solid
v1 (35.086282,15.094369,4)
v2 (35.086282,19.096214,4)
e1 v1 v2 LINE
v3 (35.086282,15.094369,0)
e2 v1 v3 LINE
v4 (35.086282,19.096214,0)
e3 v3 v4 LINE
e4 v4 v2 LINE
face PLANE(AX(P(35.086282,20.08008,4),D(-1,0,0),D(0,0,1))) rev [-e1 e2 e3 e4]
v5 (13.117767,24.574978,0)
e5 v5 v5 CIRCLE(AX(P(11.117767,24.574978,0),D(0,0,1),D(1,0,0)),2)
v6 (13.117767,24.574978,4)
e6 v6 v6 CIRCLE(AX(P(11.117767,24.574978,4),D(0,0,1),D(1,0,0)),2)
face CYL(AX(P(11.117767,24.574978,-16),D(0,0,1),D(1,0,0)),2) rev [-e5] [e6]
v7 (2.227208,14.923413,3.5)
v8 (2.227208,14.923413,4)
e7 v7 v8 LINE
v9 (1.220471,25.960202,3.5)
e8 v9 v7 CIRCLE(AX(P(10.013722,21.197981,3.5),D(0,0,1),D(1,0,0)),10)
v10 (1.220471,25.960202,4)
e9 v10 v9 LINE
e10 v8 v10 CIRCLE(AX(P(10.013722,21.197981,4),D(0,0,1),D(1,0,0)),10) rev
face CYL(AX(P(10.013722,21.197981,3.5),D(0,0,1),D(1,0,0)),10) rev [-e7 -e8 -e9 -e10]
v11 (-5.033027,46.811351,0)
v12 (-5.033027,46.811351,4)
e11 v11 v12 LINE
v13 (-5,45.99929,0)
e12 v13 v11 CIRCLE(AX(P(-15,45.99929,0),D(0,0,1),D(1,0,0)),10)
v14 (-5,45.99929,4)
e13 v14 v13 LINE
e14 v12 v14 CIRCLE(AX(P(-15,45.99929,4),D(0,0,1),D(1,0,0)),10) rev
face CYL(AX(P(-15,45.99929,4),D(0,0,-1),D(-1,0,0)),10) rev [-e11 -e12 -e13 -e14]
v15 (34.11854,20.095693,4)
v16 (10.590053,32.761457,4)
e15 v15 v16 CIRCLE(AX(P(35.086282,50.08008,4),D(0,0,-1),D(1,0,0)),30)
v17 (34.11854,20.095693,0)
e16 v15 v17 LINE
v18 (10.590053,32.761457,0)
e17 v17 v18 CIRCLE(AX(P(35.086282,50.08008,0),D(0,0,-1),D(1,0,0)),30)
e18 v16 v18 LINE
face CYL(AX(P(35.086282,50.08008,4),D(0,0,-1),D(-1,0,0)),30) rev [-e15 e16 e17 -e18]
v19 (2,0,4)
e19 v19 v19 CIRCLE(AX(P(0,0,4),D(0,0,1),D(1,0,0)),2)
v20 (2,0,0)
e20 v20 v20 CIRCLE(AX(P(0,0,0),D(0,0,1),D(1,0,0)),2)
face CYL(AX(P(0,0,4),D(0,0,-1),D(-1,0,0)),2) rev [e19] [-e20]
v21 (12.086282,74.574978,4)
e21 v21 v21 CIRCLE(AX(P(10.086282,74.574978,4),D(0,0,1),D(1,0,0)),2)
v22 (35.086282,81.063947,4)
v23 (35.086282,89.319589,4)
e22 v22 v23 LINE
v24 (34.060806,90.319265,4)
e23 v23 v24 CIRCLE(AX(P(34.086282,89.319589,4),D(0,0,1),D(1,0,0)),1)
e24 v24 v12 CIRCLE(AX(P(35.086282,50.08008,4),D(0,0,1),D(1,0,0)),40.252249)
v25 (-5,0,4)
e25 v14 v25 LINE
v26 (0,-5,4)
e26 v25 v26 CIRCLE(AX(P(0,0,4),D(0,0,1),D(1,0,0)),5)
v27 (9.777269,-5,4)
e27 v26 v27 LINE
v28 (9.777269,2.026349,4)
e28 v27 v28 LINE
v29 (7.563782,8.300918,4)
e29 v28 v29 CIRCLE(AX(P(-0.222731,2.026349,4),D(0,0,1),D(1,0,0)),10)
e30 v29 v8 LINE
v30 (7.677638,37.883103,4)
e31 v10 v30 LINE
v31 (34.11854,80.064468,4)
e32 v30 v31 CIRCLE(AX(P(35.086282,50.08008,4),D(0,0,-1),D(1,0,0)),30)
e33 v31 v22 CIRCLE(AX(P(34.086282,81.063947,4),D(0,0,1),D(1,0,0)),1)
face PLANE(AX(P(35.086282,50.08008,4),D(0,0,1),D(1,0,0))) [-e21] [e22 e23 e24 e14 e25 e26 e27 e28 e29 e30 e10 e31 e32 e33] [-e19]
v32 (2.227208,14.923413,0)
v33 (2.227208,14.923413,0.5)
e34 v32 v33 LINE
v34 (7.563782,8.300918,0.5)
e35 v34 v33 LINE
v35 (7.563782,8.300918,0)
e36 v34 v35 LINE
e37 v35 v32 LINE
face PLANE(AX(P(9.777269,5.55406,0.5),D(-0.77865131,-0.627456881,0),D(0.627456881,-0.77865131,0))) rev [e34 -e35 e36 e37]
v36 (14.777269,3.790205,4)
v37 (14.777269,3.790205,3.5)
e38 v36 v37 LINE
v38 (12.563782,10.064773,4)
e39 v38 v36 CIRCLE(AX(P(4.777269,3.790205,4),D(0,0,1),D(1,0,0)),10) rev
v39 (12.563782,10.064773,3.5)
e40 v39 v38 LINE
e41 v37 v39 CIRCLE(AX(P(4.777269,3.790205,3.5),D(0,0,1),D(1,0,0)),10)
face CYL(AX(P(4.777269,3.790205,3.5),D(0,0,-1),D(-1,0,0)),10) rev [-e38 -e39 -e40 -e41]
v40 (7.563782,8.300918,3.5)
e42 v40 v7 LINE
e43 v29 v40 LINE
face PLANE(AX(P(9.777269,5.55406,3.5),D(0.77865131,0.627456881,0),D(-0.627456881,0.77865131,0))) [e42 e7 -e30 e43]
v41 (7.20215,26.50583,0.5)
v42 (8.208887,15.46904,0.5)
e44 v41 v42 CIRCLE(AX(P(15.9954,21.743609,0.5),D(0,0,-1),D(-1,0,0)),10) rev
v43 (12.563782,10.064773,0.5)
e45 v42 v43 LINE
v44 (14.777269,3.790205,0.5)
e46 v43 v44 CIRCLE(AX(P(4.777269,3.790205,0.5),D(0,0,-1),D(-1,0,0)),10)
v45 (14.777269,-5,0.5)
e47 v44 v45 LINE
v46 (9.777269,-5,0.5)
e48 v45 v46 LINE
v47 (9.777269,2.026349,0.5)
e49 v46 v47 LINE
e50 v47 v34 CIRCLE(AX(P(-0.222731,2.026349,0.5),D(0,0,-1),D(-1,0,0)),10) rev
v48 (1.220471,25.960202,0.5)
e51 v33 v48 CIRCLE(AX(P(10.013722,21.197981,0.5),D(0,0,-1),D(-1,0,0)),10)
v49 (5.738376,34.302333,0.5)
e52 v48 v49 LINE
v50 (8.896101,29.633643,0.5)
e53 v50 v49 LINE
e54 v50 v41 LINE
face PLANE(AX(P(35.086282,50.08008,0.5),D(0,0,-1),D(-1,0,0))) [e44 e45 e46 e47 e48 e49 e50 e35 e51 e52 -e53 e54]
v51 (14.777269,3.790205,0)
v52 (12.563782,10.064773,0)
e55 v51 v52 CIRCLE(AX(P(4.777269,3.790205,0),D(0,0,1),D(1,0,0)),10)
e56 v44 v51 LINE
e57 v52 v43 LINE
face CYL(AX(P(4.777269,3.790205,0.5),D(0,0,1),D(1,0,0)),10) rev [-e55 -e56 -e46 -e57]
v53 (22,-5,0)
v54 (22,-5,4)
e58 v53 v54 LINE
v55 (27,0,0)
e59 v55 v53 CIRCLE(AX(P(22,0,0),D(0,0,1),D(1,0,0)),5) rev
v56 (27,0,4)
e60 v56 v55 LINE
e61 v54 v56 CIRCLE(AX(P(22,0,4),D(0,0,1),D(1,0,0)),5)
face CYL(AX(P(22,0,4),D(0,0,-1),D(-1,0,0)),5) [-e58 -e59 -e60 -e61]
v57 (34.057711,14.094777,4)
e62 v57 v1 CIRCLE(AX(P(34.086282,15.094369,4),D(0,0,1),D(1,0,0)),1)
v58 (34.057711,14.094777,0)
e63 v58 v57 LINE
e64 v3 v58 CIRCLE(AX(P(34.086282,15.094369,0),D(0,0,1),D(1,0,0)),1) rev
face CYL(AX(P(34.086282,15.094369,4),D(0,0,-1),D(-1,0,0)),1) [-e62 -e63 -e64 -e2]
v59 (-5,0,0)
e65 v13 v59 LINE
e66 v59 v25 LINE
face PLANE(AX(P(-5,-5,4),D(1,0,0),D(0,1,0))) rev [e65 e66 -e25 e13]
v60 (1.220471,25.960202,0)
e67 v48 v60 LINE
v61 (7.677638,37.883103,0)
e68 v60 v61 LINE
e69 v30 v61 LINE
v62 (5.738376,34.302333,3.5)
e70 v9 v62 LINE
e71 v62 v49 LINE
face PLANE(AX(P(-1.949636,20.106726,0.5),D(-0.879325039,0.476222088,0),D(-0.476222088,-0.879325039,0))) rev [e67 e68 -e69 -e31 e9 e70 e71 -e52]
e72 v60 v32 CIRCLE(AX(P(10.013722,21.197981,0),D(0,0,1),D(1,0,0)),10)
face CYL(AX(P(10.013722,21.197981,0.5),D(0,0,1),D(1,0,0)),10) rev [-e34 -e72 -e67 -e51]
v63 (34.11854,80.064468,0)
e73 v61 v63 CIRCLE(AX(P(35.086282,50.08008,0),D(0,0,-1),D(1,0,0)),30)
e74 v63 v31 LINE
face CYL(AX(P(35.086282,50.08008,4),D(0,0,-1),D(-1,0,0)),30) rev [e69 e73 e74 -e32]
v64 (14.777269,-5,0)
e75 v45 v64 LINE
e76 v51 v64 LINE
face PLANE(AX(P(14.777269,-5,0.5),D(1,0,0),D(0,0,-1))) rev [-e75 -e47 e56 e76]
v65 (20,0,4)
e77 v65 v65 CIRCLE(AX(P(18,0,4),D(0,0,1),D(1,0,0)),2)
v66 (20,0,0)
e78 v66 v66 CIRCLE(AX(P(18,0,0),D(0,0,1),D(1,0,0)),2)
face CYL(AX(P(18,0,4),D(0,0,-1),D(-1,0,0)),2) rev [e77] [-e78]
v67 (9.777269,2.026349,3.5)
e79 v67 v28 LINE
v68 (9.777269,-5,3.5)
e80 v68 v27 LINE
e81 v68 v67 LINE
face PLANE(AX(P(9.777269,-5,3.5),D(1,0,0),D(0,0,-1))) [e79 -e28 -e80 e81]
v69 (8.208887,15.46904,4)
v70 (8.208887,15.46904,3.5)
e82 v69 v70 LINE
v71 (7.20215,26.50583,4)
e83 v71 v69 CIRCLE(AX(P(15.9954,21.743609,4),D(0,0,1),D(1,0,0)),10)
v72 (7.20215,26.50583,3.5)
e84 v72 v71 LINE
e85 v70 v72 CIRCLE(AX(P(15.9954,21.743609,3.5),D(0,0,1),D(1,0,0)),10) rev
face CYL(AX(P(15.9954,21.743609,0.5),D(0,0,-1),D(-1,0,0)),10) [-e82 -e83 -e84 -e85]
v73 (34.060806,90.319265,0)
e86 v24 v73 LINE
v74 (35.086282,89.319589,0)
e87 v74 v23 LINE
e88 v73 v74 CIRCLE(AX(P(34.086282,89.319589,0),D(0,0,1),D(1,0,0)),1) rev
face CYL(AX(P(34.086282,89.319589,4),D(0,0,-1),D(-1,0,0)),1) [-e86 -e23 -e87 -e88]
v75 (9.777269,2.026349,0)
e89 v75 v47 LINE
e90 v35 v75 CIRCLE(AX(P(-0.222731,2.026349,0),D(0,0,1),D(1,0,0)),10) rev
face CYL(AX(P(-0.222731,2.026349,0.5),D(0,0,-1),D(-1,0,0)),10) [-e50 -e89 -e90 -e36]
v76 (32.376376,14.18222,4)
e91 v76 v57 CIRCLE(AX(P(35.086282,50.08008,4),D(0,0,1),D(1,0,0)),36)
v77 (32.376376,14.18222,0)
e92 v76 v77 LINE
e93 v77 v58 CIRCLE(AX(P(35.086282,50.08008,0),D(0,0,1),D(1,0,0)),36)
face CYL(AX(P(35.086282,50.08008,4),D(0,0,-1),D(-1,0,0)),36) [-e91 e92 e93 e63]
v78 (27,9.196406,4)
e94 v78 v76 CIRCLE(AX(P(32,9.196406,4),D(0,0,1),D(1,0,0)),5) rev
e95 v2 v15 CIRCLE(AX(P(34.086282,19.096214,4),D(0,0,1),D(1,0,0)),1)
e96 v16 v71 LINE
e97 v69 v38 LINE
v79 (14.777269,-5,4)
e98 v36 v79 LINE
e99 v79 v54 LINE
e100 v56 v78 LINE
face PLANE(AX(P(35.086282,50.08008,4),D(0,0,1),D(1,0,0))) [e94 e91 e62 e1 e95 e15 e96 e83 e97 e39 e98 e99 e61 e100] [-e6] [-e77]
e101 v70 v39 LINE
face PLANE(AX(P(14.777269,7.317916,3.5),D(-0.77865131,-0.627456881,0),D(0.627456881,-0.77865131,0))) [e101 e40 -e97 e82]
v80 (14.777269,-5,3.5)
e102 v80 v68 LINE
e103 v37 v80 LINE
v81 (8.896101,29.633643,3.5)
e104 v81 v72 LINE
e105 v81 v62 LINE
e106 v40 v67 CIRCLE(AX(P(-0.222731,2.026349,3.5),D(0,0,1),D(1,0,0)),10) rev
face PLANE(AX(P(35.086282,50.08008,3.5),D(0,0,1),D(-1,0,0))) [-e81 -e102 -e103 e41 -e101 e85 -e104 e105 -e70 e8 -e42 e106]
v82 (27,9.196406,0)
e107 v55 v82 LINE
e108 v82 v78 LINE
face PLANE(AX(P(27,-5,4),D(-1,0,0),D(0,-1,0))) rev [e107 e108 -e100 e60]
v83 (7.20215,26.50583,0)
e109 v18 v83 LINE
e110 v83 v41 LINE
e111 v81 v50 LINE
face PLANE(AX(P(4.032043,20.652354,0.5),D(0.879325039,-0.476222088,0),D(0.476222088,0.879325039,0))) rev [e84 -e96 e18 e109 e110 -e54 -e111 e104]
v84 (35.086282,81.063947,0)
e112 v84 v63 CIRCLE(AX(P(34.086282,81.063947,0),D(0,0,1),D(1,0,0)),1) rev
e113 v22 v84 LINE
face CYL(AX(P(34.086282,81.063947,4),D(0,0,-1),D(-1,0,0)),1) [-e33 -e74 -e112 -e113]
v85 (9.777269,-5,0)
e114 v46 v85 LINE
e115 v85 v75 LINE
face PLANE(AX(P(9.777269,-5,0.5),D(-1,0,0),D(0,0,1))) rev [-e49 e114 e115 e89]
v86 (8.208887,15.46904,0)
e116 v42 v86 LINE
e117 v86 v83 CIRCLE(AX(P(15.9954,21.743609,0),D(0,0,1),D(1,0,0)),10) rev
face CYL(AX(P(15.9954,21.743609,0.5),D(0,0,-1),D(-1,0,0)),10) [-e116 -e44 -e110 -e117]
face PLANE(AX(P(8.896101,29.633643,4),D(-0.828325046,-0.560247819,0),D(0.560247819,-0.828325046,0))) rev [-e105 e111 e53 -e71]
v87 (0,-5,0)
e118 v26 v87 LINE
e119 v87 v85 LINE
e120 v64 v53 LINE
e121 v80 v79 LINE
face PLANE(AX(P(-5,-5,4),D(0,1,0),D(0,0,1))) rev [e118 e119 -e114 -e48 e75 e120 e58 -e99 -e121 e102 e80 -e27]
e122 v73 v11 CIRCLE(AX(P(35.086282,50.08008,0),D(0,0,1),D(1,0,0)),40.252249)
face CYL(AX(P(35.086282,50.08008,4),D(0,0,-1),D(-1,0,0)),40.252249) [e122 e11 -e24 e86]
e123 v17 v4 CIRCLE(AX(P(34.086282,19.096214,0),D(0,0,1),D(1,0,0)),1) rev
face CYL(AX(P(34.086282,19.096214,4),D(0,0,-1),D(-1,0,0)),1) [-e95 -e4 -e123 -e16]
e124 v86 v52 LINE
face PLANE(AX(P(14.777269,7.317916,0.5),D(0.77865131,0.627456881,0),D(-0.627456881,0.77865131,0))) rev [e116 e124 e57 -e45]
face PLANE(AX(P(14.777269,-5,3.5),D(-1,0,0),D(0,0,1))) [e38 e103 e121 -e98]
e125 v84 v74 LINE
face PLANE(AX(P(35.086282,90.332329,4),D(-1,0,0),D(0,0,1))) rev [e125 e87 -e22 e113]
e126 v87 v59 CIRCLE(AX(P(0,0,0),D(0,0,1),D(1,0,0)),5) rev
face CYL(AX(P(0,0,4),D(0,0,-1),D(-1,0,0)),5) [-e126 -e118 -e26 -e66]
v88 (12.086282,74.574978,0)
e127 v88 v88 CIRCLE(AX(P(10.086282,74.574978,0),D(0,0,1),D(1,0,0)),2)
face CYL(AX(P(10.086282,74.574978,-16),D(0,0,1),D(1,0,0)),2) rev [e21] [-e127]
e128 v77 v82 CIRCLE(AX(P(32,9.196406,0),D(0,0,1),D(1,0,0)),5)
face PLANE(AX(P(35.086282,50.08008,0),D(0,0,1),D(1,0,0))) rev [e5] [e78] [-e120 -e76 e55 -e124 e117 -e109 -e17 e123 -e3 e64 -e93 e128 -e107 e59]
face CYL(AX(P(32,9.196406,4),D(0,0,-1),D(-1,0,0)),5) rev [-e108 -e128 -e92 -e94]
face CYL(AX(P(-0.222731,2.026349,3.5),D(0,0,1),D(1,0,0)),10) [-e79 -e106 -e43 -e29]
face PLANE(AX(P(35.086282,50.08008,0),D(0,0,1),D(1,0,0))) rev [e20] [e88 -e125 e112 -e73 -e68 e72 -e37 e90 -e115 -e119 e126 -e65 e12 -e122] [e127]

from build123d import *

# Parameters (mm, degrees)
SKETCH1_R               = 2
BOSS_EXTRUDE1_DEPTH     = 4
FILLET10_R              = 1
FILLET11_R              = 10
FILLET12_R              = 5
FILLET13_R              = 5
FILLET14_R              = 5
SKETCH2_R               = 2
CUT_EXTRUDE1_DEPTH      = 20
CUT_EXTRUDE2_DEPTH      = 0.5
FILLET15_R              = 10
CUT_EXTRUDE3_DEPTH      = 97.958369289
CUT_EXTRUDE3_DEPTH_BACK = 97.958369289
FILLET15_OF_MIRROR1_R   = 10


with BuildPart() as part:
    # Sketch1 → Boss-Extrude1 (new body)
    with BuildSketch(Plane.XY):
        with BuildLine():
            Line((-5, -5), (-5, 46.428571429))
            ThreePointArc((-5, 46.428571429), (5.360662074, 77.221028176), (35.086282243, 90.332329282))
            Line((35.086282243, 90.332329282), (35.086282243, 80.08008038))
            ThreePointArc((35.086282243, 80.08008038), (5.086282243, 50.08008038), (35.086282243, 20.08008038))
            Line((35.086282243, 20.08008038), (35.086282243, 14.08008038))
            ThreePointArc((35.086282243, 14.08008038), (31.017062028, 14.31079961), (27, 15))
            Line((27, 15), (27, -5))
            Line((27, -5), (-5, -5))
        make_face()
        Circle(SKETCH1_R, mode=Mode.SUBTRACT)
        with Locations((18, 0)):
            Circle(SKETCH1_R, mode=Mode.SUBTRACT)
    extrude(amount=BOSS_EXTRUDE1_DEPTH)

    # Fillet10
    fillet10_edges = [part.edges().sort_by_distance(p)[0] for p in [
        (35.086282243, 90.332329282, 2),
        (35.086282243, 80.08008038, 2),
        (35.086282243, 20.08008038, 2),
        (35.086282243, 14.08008038, 2),
    ]]
    fillet(fillet10_edges, radius=FILLET10_R)

    # Fillet11
    # the kernel refuses this fillet: 10 mm, written as the material it adds along each edge
    with BuildSketch(Plane(origin=(-5, 46.428571429, 0), x_dir=(-0.08596186737445177, 0.996298427860597, 0), z_dir=(0, 0, 1))) as fillet11_piece_1:
        with BuildLine():
            CenterArc((0.431926178, 9.999886119), FILLET11_R, 265.068661729, 4.657897264)
            Line((-0.427692496, 0.03690184), (0, 0))
            ThreePointArc((0, 0), (0.19210095, 0.000458397), (0.3842019, 0))
        make_face()
    extrude(amount=4)

    # Fillet12
    fillet12_edges = [part.edges().sort_by_distance(p)[0] for p in [
        (-5, -5, 2),
    ]]
    fillet(fillet12_edges, radius=FILLET12_R)

    # Fillet13
    fillet13_edges = [part.edges().sort_by_distance(p)[0] for p in [
        (27, -5, 2),
    ]]
    fillet(fillet13_edges, radius=FILLET13_R)

    # Fillet14
    fillet14_edges = [part.edges().sort_by_distance(p)[0] for p in [
        (27, 15, 2),
    ]]
    fillet(fillet14_edges, radius=FILLET14_R)

    # Sketch2 → Cut-Extrude1 (cut)
    with BuildSketch(Plane.XY.offset(4)):
        with Locations((10.086282243, 74.574977808)):
            Circle(SKETCH2_R)
        with Locations((11.117766586, 24.574977808)):
            Circle(SKETCH2_R)
    extrude(amount=-CUT_EXTRUDE1_DEPTH, mode=Mode.SUBTRACT)

    # Sketch3 → Cut-Extrude2 (cut)
    with BuildSketch(Plane(origin=(0, 0, 0), x_dir=(-1, 0, 0), z_dir=(0, 0, -1))):
        with BuildLine():
            Line((-14.777268977, -5), (-14.777268977, 7.317916248))
            Line((-14.777268977, 7.317916248), (-4.032042708, 20.652353666))
            Line((-4.032042708, 20.652353666), (-10.590052553, 32.761456562))
            ThreePointArc((-10.590052553, 32.761456562), (-9.00780857, 35.250609355), (-7.677638466, 37.883103447))
            Line((-7.677638466, 37.883103447), (1.949636164, 20.106725877))
            Line((1.949636164, 20.106725877), (-9.777268977, 5.554060462))
            Line((-9.777268977, 5.554060462), (-9.777268977, -5))
            Line((-9.777268977, -5), (-14.777268977, -5))
        make_face()
    cut_extrude2 = extrude(amount=-CUT_EXTRUDE2_DEPTH, mode=Mode.SUBTRACT)

    # Fillet15
    fillet15_edges = [part.edges().sort_by_distance(p)[0] for p in [
        (14.777268977, 7.317916248, 0.25),
        (4.032042708, 20.652353666, 0.25),
        (-1.949636164, 20.106725877, 0.25),
        (9.777268977, 5.554060462, 0.25),
    ]]
    fillet(fillet15_edges, radius=FILLET15_R)

    # Sketch4 → Cut-Extrude3 (cut, two sides: drawn at the far end of the back side and taken through both)
    with BuildSketch(Plane(origin=(0, 0, 0.5), x_dir=(-1, 0, 0), z_dir=(0, 0, -1)).offset(-CUT_EXTRUDE3_DEPTH_BACK)):
        with BuildLine():
            Line((-10.590052553, 32.761456562), (-8.89610131, 29.63364334))
            Line((-8.89610131, 29.63364334), (-5.738375915, 34.302332705))
            Line((-5.738375915, 34.302332705), (-7.677638466, 37.883103447))
            ThreePointArc((-7.677638466, 37.883103447), (-9.00780857, 35.250609355), (-10.590052553, 32.761456562))
        make_face()
    extrude(amount=CUT_EXTRUDE3_DEPTH + CUT_EXTRUDE3_DEPTH_BACK, mode=Mode.SUBTRACT)

    # Mirror1: Cut-Extrude2 across plane
    add(cut_extrude2.mirror(Plane.XY.offset(2)), mode=Mode.SUBTRACT)

    # Fillet15 of Mirror1
    fillet15_of_mirror1_edges = [part.edges().sort_by_distance(p)[0] for p in [
        (14.777268977, 7.317916248, 3.75),
        (4.032042708, 20.652353666, 3.75),
        (-1.949636164, 20.106725877, 3.75),
        (9.777268977, 5.554060462, 3.75),
    ]]
    fillet(fillet15_of_mirror1_edges, radius=FILLET15_OF_MIRROR1_R)


solid = part.part
